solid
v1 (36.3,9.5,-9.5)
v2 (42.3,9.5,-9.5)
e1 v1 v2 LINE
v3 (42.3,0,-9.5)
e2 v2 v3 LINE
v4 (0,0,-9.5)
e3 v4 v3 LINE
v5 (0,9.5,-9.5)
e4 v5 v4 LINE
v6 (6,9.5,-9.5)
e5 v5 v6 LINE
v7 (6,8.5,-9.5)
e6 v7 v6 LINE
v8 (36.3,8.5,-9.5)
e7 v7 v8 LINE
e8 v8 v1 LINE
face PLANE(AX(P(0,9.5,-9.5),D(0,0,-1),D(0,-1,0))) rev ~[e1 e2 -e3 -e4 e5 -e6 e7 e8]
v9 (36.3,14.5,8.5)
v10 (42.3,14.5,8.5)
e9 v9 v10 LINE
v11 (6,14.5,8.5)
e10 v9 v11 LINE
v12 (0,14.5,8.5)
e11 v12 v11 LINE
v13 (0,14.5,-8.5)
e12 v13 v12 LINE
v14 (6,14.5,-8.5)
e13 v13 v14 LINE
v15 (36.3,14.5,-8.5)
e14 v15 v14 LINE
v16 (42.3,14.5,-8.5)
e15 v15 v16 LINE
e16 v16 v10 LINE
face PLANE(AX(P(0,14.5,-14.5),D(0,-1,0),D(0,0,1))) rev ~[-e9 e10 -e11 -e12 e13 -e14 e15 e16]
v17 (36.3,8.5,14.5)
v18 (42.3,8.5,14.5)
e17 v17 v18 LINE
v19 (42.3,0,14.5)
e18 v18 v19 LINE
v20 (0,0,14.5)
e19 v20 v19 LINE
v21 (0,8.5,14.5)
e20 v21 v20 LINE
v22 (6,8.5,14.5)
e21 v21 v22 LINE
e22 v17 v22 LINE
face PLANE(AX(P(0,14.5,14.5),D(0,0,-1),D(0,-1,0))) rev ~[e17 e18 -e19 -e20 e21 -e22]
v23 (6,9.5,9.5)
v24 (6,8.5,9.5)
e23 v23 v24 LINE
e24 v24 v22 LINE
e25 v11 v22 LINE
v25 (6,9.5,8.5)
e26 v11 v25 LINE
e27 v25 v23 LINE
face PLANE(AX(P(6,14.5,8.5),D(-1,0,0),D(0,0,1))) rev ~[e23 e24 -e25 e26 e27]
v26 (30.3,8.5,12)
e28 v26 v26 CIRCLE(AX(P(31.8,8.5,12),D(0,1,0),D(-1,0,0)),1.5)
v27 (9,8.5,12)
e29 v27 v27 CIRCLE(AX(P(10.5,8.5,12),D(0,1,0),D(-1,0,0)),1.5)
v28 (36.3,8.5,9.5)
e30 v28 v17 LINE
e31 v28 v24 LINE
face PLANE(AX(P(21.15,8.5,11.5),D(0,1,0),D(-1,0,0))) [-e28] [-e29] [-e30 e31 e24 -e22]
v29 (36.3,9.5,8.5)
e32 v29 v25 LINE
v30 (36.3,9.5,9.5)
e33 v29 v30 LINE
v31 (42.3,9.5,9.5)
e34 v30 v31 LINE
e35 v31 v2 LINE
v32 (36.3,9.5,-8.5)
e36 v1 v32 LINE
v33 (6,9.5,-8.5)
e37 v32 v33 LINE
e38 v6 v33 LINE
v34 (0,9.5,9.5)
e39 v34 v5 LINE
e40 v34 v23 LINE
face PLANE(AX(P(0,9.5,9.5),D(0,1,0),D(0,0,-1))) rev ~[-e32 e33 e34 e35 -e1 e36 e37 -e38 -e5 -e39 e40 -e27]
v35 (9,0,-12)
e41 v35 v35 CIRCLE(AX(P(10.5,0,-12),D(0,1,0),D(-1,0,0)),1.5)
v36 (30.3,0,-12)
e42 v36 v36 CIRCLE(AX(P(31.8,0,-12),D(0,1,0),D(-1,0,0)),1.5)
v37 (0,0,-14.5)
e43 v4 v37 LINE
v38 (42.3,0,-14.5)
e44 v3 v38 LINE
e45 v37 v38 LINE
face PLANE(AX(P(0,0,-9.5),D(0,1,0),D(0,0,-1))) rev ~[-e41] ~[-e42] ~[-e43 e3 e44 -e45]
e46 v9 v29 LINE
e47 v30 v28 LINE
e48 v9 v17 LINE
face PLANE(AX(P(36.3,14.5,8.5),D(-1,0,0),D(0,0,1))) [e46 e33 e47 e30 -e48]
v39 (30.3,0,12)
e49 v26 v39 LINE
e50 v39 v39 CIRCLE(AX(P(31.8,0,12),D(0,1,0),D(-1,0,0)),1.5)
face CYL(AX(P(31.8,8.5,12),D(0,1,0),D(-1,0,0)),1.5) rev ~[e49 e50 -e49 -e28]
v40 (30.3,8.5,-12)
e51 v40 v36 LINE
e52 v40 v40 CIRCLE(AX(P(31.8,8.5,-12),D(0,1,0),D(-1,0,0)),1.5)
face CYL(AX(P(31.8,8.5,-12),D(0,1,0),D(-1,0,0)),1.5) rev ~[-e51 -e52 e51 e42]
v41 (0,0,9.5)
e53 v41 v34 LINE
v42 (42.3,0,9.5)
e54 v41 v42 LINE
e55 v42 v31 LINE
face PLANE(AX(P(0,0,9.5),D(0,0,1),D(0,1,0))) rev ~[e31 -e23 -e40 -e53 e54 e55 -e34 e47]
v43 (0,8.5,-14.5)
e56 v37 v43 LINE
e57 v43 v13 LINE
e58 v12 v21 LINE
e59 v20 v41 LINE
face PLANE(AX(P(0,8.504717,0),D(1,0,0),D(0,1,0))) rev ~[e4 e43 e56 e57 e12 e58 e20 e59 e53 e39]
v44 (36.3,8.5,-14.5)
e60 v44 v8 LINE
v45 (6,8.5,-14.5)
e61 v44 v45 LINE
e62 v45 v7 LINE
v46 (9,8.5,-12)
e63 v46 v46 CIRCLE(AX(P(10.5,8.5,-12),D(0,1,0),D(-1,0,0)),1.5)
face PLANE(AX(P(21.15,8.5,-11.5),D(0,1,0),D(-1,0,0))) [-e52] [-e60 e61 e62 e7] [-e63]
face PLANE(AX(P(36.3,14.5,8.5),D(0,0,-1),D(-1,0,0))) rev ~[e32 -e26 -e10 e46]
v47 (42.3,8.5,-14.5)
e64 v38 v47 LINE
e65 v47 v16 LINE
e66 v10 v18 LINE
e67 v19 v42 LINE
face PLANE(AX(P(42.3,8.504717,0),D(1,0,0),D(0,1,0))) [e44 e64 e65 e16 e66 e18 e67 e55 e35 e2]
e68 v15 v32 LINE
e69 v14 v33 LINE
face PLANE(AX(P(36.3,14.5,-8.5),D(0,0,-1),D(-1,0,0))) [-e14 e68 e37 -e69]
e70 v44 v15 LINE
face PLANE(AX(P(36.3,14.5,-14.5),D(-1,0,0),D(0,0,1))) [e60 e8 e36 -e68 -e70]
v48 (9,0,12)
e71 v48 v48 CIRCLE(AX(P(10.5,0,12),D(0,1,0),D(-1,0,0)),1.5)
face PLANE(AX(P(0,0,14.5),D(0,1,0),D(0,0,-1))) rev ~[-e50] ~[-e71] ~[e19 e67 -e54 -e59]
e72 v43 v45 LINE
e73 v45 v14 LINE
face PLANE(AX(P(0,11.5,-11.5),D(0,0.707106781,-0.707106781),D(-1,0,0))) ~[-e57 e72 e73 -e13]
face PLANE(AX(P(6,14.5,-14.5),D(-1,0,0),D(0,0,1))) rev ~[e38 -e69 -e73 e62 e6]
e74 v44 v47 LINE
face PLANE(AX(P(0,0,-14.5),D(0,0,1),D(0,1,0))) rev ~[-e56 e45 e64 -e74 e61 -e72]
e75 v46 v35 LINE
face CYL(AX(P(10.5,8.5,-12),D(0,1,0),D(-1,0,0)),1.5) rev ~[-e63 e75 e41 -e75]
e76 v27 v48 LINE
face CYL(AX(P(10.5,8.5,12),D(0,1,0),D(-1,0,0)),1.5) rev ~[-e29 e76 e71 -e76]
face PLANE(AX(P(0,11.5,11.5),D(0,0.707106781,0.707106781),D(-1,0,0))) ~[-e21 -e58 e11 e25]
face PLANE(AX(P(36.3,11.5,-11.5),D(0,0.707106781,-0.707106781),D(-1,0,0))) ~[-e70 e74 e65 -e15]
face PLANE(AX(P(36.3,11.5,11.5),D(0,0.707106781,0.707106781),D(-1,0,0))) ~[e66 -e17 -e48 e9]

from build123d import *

# Parameters (mm, degrees)
F1_DEPTH = 42.3
F2_W     = 30.3
F2_H     = 6
F3_DEPTH = 6
F4_SIZE  = 6
F5_R     = 1.5
F6_DEPTH = 8.501
F7_R     = 1.5
F8_DEPTH = 8.501


# Not quite as in the source:
# - a feature names something its author has since deleted; it is built from what else it names


with BuildPart() as f1:
    # F0 (on Right) → F1 (new body)
    with BuildSketch(Plane.YZ):
        Polygon((0, 9.5), (9.5, 9.5), (9.5, -9.5), (0, -9.5), (0, -14.5), (14.5, -14.5), (14.5, 14.5), (0, 14.5), align=None)
    extrude(amount=F1_DEPTH)

    # F2 (on face) → F3 (cut)
    with BuildSketch(Plane(origin=(0, 14.5, 0), x_dir=(-1, 0, 0), z_dir=(0, 1, 0))):
        with Locations((-21.15, 11.5)):
            Rectangle(F2_W, F2_H)
        with Locations((-21.15, -11.5)):
            Rectangle(F2_W, F2_H)
    extrude(amount=-F3_DEPTH, mode=Mode.SUBTRACT)

    # F4
    f4_edges = [f1.edges().sort_by_distance(p)[0] for p in [
        (3, 14.5, -14.5),
        (39.3, 14.5, -14.5),
        (39.3, 14.5, 14.5),
        (3, 14.5, 14.5),
    ]]
    chamfer(f4_edges, length=F4_SIZE)

    # F5 (on face) → F6 (cut, through all)
    with BuildSketch(Plane(origin=(0, 8.5, 0), x_dir=(-1, 0, 0), z_dir=(0, 1, 0))):
        with Locations((-31.8, 12)):
            Circle(F5_R)
        with Locations((-10.5, 12)):
            Circle(F5_R)
    extrude(amount=-F6_DEPTH, mode=Mode.SUBTRACT)

    # F7 (on face) → F8 (cut, through all)
    with BuildSketch(Plane(origin=(0, 8.5, 0), x_dir=(-1, 0, 0), z_dir=(0, 1, 0))):
        with Locations((-31.8, -12)):
            Circle(F7_R)
        with Locations((-10.5, -12)):
            Circle(F7_R)
    extrude(amount=-F8_DEPTH, mode=Mode.SUBTRACT)


solid = f1.part
